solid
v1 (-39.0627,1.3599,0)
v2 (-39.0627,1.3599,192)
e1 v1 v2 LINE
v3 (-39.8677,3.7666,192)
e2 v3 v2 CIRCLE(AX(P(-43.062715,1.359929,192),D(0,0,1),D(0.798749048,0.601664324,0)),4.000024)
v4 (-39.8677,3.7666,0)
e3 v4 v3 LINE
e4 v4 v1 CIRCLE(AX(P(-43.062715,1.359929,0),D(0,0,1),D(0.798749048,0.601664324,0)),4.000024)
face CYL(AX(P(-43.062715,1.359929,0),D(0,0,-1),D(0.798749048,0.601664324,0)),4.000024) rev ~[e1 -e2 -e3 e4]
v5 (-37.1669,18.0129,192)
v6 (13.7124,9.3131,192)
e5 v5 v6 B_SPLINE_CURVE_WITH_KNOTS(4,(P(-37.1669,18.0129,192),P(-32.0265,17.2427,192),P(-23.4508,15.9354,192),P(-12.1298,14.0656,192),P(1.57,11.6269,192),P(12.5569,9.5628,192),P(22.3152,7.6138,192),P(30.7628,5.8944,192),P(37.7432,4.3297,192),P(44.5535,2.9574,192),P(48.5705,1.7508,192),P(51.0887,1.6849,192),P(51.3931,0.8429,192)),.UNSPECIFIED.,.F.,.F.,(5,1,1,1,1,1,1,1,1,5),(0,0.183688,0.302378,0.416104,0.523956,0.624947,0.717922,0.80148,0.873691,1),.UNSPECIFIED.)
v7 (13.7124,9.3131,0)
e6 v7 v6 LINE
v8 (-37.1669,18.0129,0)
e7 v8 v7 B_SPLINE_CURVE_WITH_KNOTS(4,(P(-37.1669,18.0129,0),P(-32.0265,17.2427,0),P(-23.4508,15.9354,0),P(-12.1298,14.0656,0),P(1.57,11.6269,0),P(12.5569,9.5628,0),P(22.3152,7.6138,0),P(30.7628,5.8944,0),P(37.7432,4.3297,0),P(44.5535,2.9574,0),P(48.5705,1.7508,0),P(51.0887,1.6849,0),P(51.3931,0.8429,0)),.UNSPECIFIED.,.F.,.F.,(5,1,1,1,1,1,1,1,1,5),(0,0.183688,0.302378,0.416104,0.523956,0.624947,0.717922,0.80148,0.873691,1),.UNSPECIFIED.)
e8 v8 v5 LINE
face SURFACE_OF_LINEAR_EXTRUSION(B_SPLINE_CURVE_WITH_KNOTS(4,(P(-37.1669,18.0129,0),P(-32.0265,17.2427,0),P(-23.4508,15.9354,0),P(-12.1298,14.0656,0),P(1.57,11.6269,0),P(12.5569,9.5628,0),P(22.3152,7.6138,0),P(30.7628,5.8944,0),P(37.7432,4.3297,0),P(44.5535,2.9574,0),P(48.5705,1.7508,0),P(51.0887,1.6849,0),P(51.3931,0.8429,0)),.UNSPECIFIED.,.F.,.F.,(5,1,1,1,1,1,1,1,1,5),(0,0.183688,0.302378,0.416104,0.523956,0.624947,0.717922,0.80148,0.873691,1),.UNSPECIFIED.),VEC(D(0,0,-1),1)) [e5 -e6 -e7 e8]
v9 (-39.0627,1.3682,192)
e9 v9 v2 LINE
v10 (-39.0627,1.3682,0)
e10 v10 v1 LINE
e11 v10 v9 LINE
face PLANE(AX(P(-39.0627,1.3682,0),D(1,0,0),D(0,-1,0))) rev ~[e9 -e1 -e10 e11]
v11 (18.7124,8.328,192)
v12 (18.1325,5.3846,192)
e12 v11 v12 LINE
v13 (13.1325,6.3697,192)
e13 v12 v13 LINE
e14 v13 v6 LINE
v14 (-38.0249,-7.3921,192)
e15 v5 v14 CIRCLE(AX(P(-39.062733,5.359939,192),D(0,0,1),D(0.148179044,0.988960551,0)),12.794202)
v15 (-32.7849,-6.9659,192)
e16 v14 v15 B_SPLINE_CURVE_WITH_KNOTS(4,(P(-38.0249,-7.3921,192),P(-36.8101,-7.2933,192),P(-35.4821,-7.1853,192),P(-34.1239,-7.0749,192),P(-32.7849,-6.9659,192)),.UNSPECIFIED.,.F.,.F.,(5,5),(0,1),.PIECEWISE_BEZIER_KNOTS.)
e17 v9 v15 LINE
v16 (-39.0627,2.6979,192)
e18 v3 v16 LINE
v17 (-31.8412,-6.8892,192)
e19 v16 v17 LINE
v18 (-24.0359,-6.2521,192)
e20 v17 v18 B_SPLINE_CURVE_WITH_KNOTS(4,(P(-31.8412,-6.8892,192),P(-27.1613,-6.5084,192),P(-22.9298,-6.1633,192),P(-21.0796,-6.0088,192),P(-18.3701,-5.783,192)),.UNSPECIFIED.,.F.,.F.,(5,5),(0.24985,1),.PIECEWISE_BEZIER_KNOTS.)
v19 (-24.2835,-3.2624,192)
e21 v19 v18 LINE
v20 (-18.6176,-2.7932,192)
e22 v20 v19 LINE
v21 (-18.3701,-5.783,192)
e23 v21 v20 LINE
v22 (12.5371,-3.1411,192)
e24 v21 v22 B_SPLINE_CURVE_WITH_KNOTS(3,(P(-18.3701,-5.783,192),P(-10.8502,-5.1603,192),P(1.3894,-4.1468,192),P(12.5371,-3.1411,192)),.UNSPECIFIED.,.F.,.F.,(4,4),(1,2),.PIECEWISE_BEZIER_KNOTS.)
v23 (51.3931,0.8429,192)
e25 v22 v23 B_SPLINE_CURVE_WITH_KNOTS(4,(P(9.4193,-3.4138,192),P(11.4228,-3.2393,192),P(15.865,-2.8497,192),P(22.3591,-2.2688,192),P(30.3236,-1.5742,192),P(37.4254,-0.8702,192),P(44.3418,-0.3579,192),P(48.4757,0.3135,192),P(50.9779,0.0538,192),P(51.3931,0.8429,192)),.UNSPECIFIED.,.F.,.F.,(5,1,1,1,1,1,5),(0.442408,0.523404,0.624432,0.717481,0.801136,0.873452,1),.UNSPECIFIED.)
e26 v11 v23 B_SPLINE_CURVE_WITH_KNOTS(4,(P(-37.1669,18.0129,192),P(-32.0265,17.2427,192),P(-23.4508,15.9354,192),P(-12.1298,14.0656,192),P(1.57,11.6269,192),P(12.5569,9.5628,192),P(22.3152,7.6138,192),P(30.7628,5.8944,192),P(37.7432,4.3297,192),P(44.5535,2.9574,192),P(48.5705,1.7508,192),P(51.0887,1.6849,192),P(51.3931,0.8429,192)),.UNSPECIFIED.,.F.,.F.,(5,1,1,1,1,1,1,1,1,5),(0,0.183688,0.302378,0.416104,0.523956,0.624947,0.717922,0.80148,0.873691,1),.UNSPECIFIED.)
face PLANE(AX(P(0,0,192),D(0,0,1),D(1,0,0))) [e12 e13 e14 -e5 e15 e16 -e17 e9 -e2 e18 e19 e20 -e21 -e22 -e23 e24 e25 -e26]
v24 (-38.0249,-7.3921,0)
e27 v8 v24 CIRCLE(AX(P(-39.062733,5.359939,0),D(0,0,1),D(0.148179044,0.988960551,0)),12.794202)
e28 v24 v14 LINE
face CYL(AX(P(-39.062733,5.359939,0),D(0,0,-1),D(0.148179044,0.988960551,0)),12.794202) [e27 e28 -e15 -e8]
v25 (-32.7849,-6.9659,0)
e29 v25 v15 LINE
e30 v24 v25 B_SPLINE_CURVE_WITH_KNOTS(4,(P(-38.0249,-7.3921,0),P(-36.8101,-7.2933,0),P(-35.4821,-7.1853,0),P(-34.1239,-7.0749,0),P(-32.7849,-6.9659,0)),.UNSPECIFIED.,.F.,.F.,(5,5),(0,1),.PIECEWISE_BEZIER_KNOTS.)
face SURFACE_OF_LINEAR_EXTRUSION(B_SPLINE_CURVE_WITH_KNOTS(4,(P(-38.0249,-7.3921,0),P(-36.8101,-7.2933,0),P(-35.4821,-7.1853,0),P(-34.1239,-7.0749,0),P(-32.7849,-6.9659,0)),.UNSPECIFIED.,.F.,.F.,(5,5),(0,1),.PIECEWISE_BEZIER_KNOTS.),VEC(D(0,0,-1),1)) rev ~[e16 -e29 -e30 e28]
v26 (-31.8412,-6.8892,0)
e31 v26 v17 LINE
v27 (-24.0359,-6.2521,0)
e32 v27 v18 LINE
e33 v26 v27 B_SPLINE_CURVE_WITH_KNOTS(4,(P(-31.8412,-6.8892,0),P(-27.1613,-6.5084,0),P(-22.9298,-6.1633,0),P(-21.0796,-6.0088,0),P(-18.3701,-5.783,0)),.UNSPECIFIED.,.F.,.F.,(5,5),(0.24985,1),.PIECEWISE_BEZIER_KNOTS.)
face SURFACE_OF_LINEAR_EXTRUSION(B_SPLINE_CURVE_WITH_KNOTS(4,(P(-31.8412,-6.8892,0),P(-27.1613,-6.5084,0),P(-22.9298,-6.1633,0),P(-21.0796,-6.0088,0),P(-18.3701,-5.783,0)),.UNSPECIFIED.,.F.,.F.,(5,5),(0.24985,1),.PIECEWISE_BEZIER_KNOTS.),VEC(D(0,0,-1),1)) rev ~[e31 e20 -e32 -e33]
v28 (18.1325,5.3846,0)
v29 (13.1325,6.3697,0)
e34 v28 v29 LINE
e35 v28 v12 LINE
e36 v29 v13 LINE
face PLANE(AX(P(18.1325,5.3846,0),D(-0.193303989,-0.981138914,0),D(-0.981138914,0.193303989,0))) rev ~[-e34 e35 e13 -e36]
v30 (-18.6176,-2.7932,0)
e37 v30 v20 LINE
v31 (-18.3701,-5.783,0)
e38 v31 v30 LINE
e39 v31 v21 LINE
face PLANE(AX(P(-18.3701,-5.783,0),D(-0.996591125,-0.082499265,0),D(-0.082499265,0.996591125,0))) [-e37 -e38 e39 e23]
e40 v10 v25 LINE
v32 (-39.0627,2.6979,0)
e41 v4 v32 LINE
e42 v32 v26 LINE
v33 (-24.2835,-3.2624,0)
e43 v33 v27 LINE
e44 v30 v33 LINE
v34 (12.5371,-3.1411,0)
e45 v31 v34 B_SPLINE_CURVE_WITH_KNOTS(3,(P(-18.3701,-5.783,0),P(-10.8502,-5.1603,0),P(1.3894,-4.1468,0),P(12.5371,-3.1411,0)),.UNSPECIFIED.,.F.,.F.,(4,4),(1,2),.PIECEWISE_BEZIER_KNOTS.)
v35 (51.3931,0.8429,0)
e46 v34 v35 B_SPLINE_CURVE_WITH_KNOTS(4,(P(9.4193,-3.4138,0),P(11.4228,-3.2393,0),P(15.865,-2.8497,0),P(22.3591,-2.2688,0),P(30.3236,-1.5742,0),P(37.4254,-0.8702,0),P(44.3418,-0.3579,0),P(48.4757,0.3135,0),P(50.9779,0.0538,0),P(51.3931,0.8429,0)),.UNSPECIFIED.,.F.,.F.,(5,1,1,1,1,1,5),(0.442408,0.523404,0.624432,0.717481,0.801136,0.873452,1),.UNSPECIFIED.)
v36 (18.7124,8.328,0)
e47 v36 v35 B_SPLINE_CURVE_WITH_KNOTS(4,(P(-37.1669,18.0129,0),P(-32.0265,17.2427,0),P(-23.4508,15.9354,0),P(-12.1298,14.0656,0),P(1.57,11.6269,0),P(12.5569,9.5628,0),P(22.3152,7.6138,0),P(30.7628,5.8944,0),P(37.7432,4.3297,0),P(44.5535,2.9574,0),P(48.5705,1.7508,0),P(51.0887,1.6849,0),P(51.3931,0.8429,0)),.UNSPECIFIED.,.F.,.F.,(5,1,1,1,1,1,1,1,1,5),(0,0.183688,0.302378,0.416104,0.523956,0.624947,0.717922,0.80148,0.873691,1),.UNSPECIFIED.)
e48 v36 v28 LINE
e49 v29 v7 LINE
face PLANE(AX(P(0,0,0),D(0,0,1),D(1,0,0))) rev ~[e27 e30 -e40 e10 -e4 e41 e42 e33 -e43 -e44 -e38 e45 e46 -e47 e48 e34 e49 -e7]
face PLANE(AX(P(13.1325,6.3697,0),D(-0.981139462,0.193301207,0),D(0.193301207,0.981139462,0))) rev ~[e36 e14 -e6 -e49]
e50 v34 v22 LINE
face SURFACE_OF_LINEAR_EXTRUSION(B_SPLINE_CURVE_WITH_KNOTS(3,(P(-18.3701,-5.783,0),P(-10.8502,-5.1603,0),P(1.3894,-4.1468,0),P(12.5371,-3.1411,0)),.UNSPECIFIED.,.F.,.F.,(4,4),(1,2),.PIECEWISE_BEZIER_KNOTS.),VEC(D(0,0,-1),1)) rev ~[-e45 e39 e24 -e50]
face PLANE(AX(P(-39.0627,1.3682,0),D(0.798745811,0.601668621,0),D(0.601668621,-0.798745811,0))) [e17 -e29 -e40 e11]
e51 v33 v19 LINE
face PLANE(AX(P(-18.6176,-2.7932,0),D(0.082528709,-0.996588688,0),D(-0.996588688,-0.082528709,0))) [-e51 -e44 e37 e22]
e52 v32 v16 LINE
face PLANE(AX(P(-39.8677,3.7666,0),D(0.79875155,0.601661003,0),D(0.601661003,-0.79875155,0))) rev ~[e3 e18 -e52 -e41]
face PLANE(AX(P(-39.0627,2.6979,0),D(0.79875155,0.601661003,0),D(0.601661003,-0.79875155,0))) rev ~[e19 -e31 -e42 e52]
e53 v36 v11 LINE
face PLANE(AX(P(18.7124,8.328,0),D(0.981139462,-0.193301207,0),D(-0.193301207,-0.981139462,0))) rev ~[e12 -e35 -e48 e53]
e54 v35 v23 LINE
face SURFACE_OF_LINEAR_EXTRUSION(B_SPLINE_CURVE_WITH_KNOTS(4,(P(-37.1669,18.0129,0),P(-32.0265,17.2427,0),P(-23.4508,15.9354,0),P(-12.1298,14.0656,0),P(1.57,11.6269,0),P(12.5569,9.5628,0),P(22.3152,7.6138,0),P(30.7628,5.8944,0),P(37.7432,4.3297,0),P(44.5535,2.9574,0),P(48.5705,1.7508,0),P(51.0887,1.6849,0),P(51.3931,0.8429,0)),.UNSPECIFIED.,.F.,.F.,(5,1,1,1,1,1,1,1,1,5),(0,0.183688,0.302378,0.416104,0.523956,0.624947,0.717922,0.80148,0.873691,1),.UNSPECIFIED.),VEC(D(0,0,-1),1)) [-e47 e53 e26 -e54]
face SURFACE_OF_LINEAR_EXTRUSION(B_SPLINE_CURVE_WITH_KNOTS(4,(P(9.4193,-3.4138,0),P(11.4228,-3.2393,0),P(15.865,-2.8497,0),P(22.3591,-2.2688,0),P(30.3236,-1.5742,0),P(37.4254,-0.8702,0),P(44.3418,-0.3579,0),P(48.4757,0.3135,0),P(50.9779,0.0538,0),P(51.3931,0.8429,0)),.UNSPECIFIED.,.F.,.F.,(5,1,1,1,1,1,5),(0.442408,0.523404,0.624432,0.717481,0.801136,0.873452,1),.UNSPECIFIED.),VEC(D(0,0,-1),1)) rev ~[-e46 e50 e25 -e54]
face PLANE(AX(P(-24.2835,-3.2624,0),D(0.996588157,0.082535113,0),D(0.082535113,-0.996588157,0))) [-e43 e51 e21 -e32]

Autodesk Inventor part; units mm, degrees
ref_plane "YZ Plane" through (0, 0, 0) normal (1, 0, 0) x (0, 1, 0)
ref_plane "XZ Plane" through (0, 0, 0) normal (0, 1, 0) x (-1, 0, 0)
ref_plane "XY Plane" through (0, 0, 0) normal (0, 0, 1) x (1, 0, 0)
sketch "Sketch2" plane through (0, 0, 0) normal (0, 0, 1) x (1, 0, 0)
  line L0 (18.7124, 8.328) -> (18.1325, 5.3846)
  line L1 (13.7124, 9.3131) -> (18.7124, 8.328)
  line L2 (13.1325, 6.3697) -> (13.7124, 9.3131)
  line L3 (18.1325, 5.3846) -> (13.1325, 6.3697)
  spline S0 degree 4 poles (-37.1669, 18.0129) (-32.0265, 17.2427) (-23.4508, 15.9354) (-12.1298, 14.0656) (1.57, 11.6269) (12.5569, 9.5628) (22.3152, 7.6138) (30.7628, 5.8944) (37.7432, 4.3297) (44.5535, 2.9574) (48.5705, 1.7508) (51.0887, 1.6849) (51.3931, 0.8429) knots 0 0 0 0 0 0.183688 0.302378 0.416104 0.523956 0.624947 0.717922 0.80148 0.873691 1 1 1 1 1
  spline S1 degree 2 poles (-25.5966, 10.0026) (-25.4878, 9.9865) (-25.3792, 9.9704) knots 0 0 0 1 1 1
  line L4 (-25.4014, 9.9736) -> (-25.357, 9.9671) construction
  arc A0 (-25.3615, 9.9677) -> (-25.3969, 9.973) centre (-40.9588, -94.8535) ccw construction
  line L5 (-24.2835, -3.2624) -> (-24.0359, -6.2521)
  line L6 (-24.0359, -6.2521) -> (-18.3701, -5.783)
  line L7 (-18.6176, -2.7932) -> (-24.2835, -3.2624)
  line L8 (-39.0627, 5.3599) -> (-39.0627, 1.3599)
  line L9 (-39.0627, 1.3599) -> (-43.0627, 1.3599)
  arc A1 (-39.8677, 3.7666) -> (-39.0627, 1.3682) centre (-43.0627, 1.3599) ccw
  arc A2 (-37.1669, 18.0129) -> (-38.0249, -7.3921) centre (-39.0627, 5.3599) ccw
  line L10 (-18.3701, -5.783) -> (-18.6176, -2.7932)
  spline S2 degree 4 poles (9.4193, -3.4138) (11.4228, -3.2393) (15.865, -2.8497) (22.3591, -2.2688) (30.3236, -1.5742) (37.4254, -0.8702) (44.3418, -0.3579) (48.4757, 0.3135) (50.9779, 0.0538) (51.3931, 0.8429) knots 0.442408 0.442408 0.442408 0.442408 0.442408 0.523404 0.624432 0.717481 0.801136 0.873452 1 1 1 1 1
  line L11 (4.7469, -3.8205) -> (14.0918, -3.007) construction
  arc A3 (5.6813, -3.7375) -> (13.1571, -3.0867) centre (-353.4721, 4165.1771) ccw construction
  line L12 (-18.3701, -5.783) -> (-10.8502, -5.1603) construction
  line L13 (-10.8502, -5.1603) -> (1.3894, -4.1468) construction
  line L14 (1.3894, -4.1468) -> (12.5371, -3.1411) construction
  spline S3 degree 3 poles (-18.3701, -5.783) (-10.8502, -5.1603) (1.3894, -4.1468) (12.5371, -3.1411) knots 1 1 1 1 2 2 2 2
  line L15 (-39.8677, 3.7666) -> (-31.8412, -6.8892)
  line L16 (-39.0627, 1.3682) -> (-32.7849, -6.9659)
  spline S4 degree 4 poles (-38.0249, -7.3921) (-36.8101, -7.2933) (-35.4821, -7.1853) (-34.1239, -7.0749) (-32.7849, -6.9659) knots 0 0 0 0 0 1 1 1 1 1
  spline S5 degree 4 poles (-31.8412, -6.8892) (-27.1613, -6.5084) (-22.9298, -6.1633) (-21.0796, -6.0088) (-18.3701, -5.783) knots 0.24985 0.24985 0.24985 0.24985 0.24985 1 1 1 1 1
  line L17 (-33.3312, -7.0104) -> (-32.2386, -6.9215) construction
  arc A4 (-33.2219, -7.0015) -> (-32.3479, -6.9304) centre (-843.5448, 9960.1133) ccw construction
  line L18 (-33.4282, -7.0183) -> (-30.2541, -6.76) construction
  arc A5 (-33.1108, -6.9924) -> (-30.5716, -6.7858) centre (-842.8237, 9960.172) ccw construction
  point P0 (0, 0)
  point P1 (0.9282, 3.5218)
  point P2 (-2.5419, 1.8477)
  point P3 (-23.1779, 15.8549)
  point P4 (-10.0259, 13.6649)
  point P5 (2.1391, 11.4989)
  point P6 (13.1941, 9.4139)
  point P7 (23.0191, 7.4639)
  point P8 (31.5091, 5.7029)
  point P9 (38.5801, 4.1789)
  point P10 (44.1541, 2.9429)
  point P11 (48.1801, 2.0309)
  point P12 (50.6101, 1.4729)
  point P13 (-10.8502, -5.1603)
  point P14 (1.3894, -4.1468)
  point P15 (31.0831, -1.4851)
  point P16 (38.2711, -0.8281)
  point P17 (43.9471, -0.3001)
  point P18 (48.0511, 0.0869)
  point P19 (50.5321, 0.3239)
  point P20 (-51.8495, 5.7955)
  point P21 (51.3931, 1.2839)
  point P22 (-51.8489, 20.0789)
  point P23 (-52.6589, -8.5531)
  point P24 (51.3931, 0.4019)
  point P25 (-37.1669, 5.3448)
  point P26 (-23.1779, 4.8372)
  point P27 (-10.0259, 4.2921)
  point P28 (2.1391, 3.7285)
  point P29 (13.1941, 3.1654)
  point P30 (23.0191, 2.6255)
  point P31 (31.5091, 2.1283)
  point P32 (38.5801, 1.6897)
  point P33 (44.1541, 1.3311)
  point P34 (48.1801, 1.065)
  point P35 (50.6101, 0.9019)
  point P36 (-25.9398, -0.159)
  point P37 (9.8274, 3.135)
  point P38 (-20.001, 9.1398)
  point P39 (-14.7402, 8.2638)
  point P40 (-9.8742, 7.3974)
  point P41 (-5.4522, 6.5634)
  point P42 (-1.5222, 5.7834)
  point P43 (1.8738, 5.079)
  point P44 (4.7022, 4.4694)
  point P45 (6.9318, 3.975)
  point P46 (8.5422, 3.6102)
  point P47 (9.5142, 3.387)
  point P48 (-20.3442, 0.297)
  point P49 (-15.0702, 0.7374)
  point P50 (-10.1754, 1.155)
  point P51 (-5.715, 1.5414)
  point P52 (-1.7406, 1.893)
  point P53 (1.7034, 2.2038)
  point P54 (4.5786, 2.4666)
  point P55 (6.849, 2.6778)
  point P56 (8.4906, 2.8326)
  point P57 (9.483, 2.9274)
  point P58 (9.4193, -3.4138)
  point P59 (-39.0627, 1.3682)
  point P60 (-39.0627, 1.3599)
  dimension "d14" = 3
  dimension "d15" = 5
  dimension "d16" = 52.7751
  dimension "d17" = 3
  dimension "d18" = 5.6658
  dimension "d19" = 4
  dimension "d20" = 4
  dimension "d21" = 8
  dimension "d23" = 0.8
extrude "Extrusion3" add sketch "Sketch2" along normal blind 192 contours S0 S2 S3 L10 L7 L5 S5 L15 A1 L8 L16 S4 A2 L2 L3 L0
properties part number "2P.03.01.01.IM.FlapBody"
